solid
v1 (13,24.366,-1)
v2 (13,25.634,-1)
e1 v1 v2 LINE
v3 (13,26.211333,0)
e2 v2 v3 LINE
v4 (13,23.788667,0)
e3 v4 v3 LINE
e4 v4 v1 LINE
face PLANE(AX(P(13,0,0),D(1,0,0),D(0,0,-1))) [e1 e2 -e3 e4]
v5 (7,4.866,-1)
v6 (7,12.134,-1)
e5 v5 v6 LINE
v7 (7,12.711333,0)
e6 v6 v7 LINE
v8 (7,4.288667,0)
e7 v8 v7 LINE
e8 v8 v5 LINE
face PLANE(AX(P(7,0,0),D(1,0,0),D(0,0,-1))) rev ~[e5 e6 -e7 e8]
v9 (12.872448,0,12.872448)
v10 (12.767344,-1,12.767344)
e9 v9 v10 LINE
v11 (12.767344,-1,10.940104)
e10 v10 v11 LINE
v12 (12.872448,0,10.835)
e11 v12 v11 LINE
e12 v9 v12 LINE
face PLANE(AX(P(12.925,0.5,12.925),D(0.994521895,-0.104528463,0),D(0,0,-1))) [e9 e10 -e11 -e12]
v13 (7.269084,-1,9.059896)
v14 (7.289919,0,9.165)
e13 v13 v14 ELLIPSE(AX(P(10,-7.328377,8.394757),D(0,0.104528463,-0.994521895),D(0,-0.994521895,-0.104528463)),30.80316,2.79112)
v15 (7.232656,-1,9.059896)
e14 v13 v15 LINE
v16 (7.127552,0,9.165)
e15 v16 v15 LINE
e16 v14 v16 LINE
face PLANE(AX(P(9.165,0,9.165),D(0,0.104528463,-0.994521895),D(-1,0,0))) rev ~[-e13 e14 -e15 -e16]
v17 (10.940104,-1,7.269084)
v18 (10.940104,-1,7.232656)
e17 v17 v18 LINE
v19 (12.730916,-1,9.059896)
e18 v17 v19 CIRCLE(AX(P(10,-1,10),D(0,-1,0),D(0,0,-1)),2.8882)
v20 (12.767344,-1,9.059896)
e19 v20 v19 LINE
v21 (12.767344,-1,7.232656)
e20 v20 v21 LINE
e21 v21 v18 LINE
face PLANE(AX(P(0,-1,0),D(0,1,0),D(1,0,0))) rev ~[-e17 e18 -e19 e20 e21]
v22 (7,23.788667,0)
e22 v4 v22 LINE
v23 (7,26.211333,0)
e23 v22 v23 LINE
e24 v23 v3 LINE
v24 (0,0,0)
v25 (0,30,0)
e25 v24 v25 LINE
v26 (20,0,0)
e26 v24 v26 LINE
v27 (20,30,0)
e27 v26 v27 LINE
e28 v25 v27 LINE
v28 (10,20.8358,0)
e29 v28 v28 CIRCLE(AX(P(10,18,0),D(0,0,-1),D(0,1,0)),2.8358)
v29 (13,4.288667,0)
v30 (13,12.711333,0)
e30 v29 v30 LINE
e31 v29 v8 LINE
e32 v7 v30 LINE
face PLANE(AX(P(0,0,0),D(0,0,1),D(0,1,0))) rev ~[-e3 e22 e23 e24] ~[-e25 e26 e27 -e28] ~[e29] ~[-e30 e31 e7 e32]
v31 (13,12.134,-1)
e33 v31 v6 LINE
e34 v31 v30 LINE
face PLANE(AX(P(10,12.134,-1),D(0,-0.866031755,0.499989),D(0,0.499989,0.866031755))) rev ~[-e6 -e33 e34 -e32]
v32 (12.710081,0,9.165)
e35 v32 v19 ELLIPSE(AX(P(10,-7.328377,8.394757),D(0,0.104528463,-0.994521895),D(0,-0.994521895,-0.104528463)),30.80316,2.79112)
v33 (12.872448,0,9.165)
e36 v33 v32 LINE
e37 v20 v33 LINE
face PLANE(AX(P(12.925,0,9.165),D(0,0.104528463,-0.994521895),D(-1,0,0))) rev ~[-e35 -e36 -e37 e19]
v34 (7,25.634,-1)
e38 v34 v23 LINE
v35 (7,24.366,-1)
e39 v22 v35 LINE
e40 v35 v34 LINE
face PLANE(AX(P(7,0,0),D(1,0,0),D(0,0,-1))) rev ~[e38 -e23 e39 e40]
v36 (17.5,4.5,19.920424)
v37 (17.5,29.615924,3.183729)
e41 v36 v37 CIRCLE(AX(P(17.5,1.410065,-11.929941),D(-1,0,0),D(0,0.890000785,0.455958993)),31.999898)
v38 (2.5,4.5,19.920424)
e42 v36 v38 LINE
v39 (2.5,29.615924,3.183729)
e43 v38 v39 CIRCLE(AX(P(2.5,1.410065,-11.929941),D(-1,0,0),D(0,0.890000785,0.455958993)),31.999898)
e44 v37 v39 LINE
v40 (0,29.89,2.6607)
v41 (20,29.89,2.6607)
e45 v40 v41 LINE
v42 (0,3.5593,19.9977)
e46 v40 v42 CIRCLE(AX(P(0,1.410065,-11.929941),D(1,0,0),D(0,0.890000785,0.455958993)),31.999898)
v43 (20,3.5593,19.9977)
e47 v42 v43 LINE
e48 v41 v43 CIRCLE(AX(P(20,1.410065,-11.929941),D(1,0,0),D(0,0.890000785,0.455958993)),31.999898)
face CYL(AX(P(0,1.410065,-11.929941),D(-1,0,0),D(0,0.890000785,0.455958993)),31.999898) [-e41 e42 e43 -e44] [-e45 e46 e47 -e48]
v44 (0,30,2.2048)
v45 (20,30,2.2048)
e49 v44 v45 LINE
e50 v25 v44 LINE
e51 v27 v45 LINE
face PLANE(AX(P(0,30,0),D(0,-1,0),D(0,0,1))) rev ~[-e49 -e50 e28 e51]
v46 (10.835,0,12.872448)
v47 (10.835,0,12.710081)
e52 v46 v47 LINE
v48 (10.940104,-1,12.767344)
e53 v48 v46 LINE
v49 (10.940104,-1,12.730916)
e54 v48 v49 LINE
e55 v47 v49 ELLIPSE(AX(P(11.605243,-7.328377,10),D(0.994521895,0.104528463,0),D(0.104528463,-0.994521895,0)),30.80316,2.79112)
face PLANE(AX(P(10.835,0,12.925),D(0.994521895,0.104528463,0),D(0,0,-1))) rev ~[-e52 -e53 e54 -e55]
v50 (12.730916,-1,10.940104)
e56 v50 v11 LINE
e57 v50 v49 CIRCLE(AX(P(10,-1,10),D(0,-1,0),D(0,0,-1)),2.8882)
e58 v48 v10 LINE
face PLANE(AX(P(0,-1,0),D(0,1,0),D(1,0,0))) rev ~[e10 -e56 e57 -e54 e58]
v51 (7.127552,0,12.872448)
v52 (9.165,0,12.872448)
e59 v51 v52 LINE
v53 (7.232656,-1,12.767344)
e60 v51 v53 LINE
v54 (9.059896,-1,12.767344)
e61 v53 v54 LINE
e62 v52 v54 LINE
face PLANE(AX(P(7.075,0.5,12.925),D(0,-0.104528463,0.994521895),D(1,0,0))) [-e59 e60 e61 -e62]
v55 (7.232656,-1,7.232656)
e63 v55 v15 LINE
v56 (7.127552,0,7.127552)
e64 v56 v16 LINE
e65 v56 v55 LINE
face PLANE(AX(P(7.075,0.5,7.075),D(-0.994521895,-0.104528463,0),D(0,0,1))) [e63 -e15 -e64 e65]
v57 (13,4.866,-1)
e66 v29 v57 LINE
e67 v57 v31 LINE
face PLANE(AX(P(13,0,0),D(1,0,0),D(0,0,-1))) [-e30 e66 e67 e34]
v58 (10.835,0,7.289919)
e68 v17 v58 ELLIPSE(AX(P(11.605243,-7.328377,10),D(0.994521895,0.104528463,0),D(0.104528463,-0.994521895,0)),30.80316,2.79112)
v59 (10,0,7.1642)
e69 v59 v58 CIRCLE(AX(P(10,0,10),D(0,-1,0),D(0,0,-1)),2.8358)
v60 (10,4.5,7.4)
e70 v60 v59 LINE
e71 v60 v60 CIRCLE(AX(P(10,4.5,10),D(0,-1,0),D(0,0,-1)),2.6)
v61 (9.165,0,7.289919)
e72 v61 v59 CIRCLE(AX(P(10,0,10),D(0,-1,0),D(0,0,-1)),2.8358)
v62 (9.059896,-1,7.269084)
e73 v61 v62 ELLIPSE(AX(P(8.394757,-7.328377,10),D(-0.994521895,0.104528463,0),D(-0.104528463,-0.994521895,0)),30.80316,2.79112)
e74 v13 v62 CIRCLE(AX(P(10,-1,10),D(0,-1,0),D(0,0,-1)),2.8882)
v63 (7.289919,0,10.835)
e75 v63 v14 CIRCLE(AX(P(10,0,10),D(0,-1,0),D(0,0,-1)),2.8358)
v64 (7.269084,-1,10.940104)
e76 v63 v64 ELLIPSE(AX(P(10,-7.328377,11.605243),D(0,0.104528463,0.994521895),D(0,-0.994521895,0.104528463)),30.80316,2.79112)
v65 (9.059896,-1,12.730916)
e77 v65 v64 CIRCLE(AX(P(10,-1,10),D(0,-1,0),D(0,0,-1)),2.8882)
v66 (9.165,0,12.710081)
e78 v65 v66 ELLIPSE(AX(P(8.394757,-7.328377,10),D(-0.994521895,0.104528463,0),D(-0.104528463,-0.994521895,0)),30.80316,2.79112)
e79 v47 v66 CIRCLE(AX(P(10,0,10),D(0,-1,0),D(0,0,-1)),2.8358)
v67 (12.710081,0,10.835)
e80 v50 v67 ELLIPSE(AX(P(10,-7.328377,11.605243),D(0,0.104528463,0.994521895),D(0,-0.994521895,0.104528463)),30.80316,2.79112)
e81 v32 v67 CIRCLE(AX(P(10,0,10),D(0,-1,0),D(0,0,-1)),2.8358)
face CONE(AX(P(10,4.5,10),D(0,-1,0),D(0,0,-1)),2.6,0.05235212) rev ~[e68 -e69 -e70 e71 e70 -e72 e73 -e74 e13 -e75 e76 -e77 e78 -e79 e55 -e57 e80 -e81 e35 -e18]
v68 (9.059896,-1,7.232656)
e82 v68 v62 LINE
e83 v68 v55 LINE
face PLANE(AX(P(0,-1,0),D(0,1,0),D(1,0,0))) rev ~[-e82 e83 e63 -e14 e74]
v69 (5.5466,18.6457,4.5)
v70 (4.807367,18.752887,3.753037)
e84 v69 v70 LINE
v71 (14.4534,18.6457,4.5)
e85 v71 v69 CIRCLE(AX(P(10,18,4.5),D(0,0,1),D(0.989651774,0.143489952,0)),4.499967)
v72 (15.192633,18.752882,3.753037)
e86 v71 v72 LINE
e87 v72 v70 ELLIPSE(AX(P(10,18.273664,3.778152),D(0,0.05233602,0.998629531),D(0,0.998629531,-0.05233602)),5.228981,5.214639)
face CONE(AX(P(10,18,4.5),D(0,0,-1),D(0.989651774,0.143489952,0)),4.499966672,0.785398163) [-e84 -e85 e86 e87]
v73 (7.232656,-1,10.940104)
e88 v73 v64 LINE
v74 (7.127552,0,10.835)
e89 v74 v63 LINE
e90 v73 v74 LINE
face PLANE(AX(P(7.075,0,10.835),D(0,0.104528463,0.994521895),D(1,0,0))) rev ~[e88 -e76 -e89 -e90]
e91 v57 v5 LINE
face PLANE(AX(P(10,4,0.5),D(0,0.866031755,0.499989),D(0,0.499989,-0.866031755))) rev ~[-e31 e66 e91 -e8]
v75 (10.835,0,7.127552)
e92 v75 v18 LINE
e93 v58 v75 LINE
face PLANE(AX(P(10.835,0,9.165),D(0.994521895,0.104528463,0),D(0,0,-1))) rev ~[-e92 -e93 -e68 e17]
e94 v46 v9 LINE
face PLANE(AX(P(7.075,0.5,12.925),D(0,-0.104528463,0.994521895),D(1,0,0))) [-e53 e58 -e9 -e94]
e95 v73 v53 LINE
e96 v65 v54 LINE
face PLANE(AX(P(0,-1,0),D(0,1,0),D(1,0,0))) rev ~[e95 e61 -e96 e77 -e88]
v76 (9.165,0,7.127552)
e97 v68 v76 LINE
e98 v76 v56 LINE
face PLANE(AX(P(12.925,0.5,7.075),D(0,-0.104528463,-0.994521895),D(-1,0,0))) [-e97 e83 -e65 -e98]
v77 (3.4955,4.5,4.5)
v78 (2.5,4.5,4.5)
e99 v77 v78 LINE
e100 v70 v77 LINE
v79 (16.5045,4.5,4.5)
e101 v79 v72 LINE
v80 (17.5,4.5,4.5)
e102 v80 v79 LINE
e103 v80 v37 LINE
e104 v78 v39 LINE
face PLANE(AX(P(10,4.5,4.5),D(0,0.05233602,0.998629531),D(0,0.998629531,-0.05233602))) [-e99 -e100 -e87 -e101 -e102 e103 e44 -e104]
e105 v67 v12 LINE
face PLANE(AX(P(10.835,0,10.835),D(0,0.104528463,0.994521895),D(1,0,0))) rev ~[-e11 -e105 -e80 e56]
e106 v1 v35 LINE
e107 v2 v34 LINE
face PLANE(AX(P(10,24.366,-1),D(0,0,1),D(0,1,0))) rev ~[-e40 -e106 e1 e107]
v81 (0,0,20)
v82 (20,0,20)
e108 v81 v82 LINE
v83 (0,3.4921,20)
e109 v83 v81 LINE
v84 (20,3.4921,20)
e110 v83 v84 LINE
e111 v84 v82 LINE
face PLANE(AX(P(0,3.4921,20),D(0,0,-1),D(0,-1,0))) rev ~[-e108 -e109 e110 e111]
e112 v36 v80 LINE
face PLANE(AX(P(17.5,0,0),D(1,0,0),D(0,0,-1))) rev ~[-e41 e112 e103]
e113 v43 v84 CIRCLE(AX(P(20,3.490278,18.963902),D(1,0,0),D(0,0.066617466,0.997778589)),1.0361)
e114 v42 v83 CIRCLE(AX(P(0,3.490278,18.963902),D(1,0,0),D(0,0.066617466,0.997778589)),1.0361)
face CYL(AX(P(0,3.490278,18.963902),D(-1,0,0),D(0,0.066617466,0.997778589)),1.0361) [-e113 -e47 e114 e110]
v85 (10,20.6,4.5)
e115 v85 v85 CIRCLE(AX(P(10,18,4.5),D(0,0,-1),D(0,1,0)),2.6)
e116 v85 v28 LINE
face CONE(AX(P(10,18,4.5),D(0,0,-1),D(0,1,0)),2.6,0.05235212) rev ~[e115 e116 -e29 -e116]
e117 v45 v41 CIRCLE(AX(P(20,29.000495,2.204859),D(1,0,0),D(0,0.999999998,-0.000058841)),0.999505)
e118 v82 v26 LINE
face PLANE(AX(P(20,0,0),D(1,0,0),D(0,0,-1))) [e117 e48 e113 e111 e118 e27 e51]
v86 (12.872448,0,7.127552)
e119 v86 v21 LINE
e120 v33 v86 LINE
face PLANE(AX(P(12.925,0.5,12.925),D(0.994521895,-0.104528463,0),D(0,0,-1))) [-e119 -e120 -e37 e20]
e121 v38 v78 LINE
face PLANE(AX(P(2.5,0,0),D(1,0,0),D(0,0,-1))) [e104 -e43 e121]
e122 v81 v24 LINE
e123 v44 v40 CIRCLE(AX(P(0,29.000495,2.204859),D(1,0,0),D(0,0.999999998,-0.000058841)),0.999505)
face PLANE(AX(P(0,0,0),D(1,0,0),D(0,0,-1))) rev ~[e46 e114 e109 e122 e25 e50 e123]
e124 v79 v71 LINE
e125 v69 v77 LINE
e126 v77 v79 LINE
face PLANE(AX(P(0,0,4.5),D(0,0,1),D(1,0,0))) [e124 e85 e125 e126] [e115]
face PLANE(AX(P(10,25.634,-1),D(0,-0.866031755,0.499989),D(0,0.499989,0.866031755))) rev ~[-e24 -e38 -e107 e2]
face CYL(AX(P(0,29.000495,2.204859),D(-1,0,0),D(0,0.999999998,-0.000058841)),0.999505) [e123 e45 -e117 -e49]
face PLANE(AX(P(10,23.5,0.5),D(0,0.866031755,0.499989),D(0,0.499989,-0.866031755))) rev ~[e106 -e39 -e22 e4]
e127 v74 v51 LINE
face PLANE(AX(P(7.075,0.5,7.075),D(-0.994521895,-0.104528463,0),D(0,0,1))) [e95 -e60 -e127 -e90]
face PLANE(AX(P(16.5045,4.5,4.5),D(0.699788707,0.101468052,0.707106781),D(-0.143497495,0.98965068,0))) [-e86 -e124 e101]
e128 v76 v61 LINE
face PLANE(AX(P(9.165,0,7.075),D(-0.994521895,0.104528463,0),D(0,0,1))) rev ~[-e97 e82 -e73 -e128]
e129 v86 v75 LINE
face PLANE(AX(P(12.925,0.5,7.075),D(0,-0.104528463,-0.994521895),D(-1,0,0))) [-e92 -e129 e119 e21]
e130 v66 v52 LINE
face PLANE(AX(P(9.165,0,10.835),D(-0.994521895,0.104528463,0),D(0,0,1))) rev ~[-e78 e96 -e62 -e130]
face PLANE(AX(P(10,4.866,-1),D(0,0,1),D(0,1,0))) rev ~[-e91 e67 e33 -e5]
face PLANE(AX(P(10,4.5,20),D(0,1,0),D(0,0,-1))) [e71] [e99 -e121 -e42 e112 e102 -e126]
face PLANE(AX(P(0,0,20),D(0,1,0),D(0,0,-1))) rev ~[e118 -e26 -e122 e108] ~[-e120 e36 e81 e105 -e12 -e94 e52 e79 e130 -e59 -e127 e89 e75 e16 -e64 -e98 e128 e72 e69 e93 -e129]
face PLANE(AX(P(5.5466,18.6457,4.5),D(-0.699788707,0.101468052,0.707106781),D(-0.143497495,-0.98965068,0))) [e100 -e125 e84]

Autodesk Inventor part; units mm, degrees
sketch "Sketch_1" plane through (0, 0, 0) normal (1, 0, 0) x (0, 0, -1)
  line L0 (-20, 3.4921) -> (-20, 0)
  line L1 (-20, 0) -> (0, 0)
  line L2 (0, 0) -> (0, 30)
  line L3 (0, 30) -> (-2.2048, 30)
  arc A0 (-2.2048, 30) -> (-2.6607, 29.89) centre (-2.2048, 29) ccw
  arc A1 (-2.6607, 29.89) -> (-19.9977, 3.5593) centre (11.93, 1.41) ccw
  arc A2 (-19.9977, 3.5593) -> (-20, 3.4921) centre (-19, 3.4921) ccw
extrude "Extrusion1" add sketch "Sketch_1" along normal blind 20
sketch "Sketch_2" plane through (10, 0, 0) normal (1, 0, 0) x (0, 0, -1)
  line L0 (-20, 30) -> (-20, 4.5)
  line L1 (-20, 4.5) -> (-4.5, 4.5)
  line L2 (-4.5, 4.5) -> (-3.1636, 30)
  line L3 (-3.1636, 30) -> (-20, 30)
extrude "Extrusion2" cut sketch "Sketch_2" along normal mid plane 15
sketch "Sketch_5" plane through (10, 0, 0) normal (1, 0, 0) x (0, 0, -1)
  line L0 (-0.5, 26.5) -> (-0.5, 23.5)
  line L1 (-0.5, 23.5) -> (1, 24.366)
  line L2 (1, 24.366) -> (1, 25.634)
  line L3 (1, 25.634) -> (-0.5, 26.5)
extrude "Extrusion3" add sketch "Sketch_5" along normal mid plane 6
sketch "Sketch_6" plane through (10, 0, 0) normal (1, 0, 0) x (0, 0, -1)
  line L0 (-0.5, 13) -> (-0.5, 4)
  line L1 (-0.5, 4) -> (1, 4.866)
  line L2 (1, 4.866) -> (1, 12.134)
  line L3 (1, 12.134) -> (-0.5, 13)
extrude "Extrusion4" add sketch "Sketch_6" along normal mid plane 6
sketch "Sketch_3" plane through (0, 0, 4.5) normal (0, 0, 1) x (1, 0, 0)
  line L0 (3.4955, 4.5) -> (16.5045, 4.5)
  line L1 (16.5045, 4.5) -> (14.4534, 18.6457)
  arc A0 (14.4534, 18.6457) -> (5.5466, 18.6457) centre (10, 18) ccw
  line L2 (5.5466, 18.6457) -> (3.4955, 4.5)
extrude "Extrusion5" add sketch "Sketch_3" against normal blind 2 draft 45
sketch "Sketch_7" plane through (0, 0.5, 0) normal (0, 1, 0) x (1, 0, 0)
  line L0 (7.075, -12.925) -> (12.925, -12.925)
  line L1 (12.925, -12.925) -> (12.925, -7.075)
  line L2 (12.925, -7.075) -> (7.075, -7.075)
  line L3 (7.075, -7.075) -> (7.075, -12.925)
extrude "Extrusion6" add sketch "Sketch_7" against normal blind 1.5 draft -6
sketch "Sketch_9" plane through (0, 0, 0) normal (0, 1, 0) x (1, 0, 0)
  line L0 (7.075, -10.835) -> (9.165, -10.835)
  line L1 (9.165, -10.835) -> (9.165, -12.925)
  line L2 (9.165, -12.925) -> (10.835, -12.925)
  line L3 (10.835, -12.925) -> (10.835, -10.835)
  line L4 (10.835, -10.835) -> (12.925, -10.835)
  line L5 (12.925, -10.835) -> (12.925, -9.165)
  line L6 (12.925, -9.165) -> (10.835, -9.165)
  line L7 (10.835, -9.165) -> (10.835, -7.075)
  line L8 (10.835, -7.075) -> (9.165, -7.075)
  line L9 (9.165, -7.075) -> (9.165, -9.165)
  line L10 (9.165, -9.165) -> (7.075, -9.165)
  line L11 (7.075, -9.165) -> (7.075, -10.835)
extrude "Extrusion7" cut sketch "Sketch_9" against normal blind 1 draft 6
sketch "Sketch_4" plane through (10, 0, 0) normal (1, 0, 0) x (0, 0, -1)
  line L0 (0, 18) -> (-4.5, 18)
  line L1 (-4.5, 18) -> (-4.5, 20.6)
  line L2 (-4.5, 20.6) -> (0, 20.8358)
  line L3 (0, 20.8358) -> (0, 18)
  line L4 (0, 18) -> (-4.5, 18)
revolve "Revolution1" cut sketch "Sketch_4" angle 360 about axis through (10, 18, 0) along (0, 0, -1)
sketch "Sketch_8" plane through (10, 0, 0) normal (1, 0, 0) x (0, 0, -1)
  line L0 (-10, -1) -> (-10, 4.5)
  line L1 (-10, 4.5) -> (-7.4, 4.5)
  line L2 (-7.4, 4.5) -> (-7.1118, -1)
  line L3 (-7.1118, -1) -> (-10, -1)
  line L4 (-10, -1) -> (-10, 4.5)
revolve "Revolution2" cut sketch "Sketch_8" angle 360 about axis through (10, -1, 10) along (0, -1, 0)
ref_plane "to_bolt1_XY" through (10, 18, 4.5) normal (0, 0, 1) x (1, 0, 0)
ref_plane "to_bolt1_YZ" through (10, 18, 4.5) normal (1, 0, 0) x (0, 1, 0)
ref_plane "to_bolt1_ZX" through (10, 18, 4.5) normal (0, 1, 0) x (0, 0, 1)
ref_plane "to_bolt2_XY" through (10, 4.5, 10) normal (0, 1, 0) x (1, 0, 0)
ref_plane "to_bolt2_YZ" through (10, 4.5, 10) normal (1, 0, 0) x (0, 0, -1)
ref_plane "to_bolt2_ZX" through (10, 4.5, 10) normal (0, 0, -1) x (0, 1, 0)
ref_plane "to_nut1_XY" through (10, 18, -1) normal (0, 0, -1) x (0, 1, 0)
ref_plane "to_nut1_YZ" through (10, 18, -1) normal (0, 1, 0) x (1, 0, 0)
ref_plane "to_nut1_ZX" through (10, 18, -1) normal (1, 0, 0) x (0, 0, -1)
ref_plane "to_nut2_XY" through (10, -1, 10) normal (0, -1, 0) x (0, 0, -1)
ref_plane "to_nut2_YZ" through (10, -1, 10) normal (0, 0, -1) x (1, 0, 0)
ref_plane "to_nut2_ZX" through (10, -1, 10) normal (1, 0, 0) x (0, -1, 0)
properties part number "HBLFSNF5-SSU_b"
